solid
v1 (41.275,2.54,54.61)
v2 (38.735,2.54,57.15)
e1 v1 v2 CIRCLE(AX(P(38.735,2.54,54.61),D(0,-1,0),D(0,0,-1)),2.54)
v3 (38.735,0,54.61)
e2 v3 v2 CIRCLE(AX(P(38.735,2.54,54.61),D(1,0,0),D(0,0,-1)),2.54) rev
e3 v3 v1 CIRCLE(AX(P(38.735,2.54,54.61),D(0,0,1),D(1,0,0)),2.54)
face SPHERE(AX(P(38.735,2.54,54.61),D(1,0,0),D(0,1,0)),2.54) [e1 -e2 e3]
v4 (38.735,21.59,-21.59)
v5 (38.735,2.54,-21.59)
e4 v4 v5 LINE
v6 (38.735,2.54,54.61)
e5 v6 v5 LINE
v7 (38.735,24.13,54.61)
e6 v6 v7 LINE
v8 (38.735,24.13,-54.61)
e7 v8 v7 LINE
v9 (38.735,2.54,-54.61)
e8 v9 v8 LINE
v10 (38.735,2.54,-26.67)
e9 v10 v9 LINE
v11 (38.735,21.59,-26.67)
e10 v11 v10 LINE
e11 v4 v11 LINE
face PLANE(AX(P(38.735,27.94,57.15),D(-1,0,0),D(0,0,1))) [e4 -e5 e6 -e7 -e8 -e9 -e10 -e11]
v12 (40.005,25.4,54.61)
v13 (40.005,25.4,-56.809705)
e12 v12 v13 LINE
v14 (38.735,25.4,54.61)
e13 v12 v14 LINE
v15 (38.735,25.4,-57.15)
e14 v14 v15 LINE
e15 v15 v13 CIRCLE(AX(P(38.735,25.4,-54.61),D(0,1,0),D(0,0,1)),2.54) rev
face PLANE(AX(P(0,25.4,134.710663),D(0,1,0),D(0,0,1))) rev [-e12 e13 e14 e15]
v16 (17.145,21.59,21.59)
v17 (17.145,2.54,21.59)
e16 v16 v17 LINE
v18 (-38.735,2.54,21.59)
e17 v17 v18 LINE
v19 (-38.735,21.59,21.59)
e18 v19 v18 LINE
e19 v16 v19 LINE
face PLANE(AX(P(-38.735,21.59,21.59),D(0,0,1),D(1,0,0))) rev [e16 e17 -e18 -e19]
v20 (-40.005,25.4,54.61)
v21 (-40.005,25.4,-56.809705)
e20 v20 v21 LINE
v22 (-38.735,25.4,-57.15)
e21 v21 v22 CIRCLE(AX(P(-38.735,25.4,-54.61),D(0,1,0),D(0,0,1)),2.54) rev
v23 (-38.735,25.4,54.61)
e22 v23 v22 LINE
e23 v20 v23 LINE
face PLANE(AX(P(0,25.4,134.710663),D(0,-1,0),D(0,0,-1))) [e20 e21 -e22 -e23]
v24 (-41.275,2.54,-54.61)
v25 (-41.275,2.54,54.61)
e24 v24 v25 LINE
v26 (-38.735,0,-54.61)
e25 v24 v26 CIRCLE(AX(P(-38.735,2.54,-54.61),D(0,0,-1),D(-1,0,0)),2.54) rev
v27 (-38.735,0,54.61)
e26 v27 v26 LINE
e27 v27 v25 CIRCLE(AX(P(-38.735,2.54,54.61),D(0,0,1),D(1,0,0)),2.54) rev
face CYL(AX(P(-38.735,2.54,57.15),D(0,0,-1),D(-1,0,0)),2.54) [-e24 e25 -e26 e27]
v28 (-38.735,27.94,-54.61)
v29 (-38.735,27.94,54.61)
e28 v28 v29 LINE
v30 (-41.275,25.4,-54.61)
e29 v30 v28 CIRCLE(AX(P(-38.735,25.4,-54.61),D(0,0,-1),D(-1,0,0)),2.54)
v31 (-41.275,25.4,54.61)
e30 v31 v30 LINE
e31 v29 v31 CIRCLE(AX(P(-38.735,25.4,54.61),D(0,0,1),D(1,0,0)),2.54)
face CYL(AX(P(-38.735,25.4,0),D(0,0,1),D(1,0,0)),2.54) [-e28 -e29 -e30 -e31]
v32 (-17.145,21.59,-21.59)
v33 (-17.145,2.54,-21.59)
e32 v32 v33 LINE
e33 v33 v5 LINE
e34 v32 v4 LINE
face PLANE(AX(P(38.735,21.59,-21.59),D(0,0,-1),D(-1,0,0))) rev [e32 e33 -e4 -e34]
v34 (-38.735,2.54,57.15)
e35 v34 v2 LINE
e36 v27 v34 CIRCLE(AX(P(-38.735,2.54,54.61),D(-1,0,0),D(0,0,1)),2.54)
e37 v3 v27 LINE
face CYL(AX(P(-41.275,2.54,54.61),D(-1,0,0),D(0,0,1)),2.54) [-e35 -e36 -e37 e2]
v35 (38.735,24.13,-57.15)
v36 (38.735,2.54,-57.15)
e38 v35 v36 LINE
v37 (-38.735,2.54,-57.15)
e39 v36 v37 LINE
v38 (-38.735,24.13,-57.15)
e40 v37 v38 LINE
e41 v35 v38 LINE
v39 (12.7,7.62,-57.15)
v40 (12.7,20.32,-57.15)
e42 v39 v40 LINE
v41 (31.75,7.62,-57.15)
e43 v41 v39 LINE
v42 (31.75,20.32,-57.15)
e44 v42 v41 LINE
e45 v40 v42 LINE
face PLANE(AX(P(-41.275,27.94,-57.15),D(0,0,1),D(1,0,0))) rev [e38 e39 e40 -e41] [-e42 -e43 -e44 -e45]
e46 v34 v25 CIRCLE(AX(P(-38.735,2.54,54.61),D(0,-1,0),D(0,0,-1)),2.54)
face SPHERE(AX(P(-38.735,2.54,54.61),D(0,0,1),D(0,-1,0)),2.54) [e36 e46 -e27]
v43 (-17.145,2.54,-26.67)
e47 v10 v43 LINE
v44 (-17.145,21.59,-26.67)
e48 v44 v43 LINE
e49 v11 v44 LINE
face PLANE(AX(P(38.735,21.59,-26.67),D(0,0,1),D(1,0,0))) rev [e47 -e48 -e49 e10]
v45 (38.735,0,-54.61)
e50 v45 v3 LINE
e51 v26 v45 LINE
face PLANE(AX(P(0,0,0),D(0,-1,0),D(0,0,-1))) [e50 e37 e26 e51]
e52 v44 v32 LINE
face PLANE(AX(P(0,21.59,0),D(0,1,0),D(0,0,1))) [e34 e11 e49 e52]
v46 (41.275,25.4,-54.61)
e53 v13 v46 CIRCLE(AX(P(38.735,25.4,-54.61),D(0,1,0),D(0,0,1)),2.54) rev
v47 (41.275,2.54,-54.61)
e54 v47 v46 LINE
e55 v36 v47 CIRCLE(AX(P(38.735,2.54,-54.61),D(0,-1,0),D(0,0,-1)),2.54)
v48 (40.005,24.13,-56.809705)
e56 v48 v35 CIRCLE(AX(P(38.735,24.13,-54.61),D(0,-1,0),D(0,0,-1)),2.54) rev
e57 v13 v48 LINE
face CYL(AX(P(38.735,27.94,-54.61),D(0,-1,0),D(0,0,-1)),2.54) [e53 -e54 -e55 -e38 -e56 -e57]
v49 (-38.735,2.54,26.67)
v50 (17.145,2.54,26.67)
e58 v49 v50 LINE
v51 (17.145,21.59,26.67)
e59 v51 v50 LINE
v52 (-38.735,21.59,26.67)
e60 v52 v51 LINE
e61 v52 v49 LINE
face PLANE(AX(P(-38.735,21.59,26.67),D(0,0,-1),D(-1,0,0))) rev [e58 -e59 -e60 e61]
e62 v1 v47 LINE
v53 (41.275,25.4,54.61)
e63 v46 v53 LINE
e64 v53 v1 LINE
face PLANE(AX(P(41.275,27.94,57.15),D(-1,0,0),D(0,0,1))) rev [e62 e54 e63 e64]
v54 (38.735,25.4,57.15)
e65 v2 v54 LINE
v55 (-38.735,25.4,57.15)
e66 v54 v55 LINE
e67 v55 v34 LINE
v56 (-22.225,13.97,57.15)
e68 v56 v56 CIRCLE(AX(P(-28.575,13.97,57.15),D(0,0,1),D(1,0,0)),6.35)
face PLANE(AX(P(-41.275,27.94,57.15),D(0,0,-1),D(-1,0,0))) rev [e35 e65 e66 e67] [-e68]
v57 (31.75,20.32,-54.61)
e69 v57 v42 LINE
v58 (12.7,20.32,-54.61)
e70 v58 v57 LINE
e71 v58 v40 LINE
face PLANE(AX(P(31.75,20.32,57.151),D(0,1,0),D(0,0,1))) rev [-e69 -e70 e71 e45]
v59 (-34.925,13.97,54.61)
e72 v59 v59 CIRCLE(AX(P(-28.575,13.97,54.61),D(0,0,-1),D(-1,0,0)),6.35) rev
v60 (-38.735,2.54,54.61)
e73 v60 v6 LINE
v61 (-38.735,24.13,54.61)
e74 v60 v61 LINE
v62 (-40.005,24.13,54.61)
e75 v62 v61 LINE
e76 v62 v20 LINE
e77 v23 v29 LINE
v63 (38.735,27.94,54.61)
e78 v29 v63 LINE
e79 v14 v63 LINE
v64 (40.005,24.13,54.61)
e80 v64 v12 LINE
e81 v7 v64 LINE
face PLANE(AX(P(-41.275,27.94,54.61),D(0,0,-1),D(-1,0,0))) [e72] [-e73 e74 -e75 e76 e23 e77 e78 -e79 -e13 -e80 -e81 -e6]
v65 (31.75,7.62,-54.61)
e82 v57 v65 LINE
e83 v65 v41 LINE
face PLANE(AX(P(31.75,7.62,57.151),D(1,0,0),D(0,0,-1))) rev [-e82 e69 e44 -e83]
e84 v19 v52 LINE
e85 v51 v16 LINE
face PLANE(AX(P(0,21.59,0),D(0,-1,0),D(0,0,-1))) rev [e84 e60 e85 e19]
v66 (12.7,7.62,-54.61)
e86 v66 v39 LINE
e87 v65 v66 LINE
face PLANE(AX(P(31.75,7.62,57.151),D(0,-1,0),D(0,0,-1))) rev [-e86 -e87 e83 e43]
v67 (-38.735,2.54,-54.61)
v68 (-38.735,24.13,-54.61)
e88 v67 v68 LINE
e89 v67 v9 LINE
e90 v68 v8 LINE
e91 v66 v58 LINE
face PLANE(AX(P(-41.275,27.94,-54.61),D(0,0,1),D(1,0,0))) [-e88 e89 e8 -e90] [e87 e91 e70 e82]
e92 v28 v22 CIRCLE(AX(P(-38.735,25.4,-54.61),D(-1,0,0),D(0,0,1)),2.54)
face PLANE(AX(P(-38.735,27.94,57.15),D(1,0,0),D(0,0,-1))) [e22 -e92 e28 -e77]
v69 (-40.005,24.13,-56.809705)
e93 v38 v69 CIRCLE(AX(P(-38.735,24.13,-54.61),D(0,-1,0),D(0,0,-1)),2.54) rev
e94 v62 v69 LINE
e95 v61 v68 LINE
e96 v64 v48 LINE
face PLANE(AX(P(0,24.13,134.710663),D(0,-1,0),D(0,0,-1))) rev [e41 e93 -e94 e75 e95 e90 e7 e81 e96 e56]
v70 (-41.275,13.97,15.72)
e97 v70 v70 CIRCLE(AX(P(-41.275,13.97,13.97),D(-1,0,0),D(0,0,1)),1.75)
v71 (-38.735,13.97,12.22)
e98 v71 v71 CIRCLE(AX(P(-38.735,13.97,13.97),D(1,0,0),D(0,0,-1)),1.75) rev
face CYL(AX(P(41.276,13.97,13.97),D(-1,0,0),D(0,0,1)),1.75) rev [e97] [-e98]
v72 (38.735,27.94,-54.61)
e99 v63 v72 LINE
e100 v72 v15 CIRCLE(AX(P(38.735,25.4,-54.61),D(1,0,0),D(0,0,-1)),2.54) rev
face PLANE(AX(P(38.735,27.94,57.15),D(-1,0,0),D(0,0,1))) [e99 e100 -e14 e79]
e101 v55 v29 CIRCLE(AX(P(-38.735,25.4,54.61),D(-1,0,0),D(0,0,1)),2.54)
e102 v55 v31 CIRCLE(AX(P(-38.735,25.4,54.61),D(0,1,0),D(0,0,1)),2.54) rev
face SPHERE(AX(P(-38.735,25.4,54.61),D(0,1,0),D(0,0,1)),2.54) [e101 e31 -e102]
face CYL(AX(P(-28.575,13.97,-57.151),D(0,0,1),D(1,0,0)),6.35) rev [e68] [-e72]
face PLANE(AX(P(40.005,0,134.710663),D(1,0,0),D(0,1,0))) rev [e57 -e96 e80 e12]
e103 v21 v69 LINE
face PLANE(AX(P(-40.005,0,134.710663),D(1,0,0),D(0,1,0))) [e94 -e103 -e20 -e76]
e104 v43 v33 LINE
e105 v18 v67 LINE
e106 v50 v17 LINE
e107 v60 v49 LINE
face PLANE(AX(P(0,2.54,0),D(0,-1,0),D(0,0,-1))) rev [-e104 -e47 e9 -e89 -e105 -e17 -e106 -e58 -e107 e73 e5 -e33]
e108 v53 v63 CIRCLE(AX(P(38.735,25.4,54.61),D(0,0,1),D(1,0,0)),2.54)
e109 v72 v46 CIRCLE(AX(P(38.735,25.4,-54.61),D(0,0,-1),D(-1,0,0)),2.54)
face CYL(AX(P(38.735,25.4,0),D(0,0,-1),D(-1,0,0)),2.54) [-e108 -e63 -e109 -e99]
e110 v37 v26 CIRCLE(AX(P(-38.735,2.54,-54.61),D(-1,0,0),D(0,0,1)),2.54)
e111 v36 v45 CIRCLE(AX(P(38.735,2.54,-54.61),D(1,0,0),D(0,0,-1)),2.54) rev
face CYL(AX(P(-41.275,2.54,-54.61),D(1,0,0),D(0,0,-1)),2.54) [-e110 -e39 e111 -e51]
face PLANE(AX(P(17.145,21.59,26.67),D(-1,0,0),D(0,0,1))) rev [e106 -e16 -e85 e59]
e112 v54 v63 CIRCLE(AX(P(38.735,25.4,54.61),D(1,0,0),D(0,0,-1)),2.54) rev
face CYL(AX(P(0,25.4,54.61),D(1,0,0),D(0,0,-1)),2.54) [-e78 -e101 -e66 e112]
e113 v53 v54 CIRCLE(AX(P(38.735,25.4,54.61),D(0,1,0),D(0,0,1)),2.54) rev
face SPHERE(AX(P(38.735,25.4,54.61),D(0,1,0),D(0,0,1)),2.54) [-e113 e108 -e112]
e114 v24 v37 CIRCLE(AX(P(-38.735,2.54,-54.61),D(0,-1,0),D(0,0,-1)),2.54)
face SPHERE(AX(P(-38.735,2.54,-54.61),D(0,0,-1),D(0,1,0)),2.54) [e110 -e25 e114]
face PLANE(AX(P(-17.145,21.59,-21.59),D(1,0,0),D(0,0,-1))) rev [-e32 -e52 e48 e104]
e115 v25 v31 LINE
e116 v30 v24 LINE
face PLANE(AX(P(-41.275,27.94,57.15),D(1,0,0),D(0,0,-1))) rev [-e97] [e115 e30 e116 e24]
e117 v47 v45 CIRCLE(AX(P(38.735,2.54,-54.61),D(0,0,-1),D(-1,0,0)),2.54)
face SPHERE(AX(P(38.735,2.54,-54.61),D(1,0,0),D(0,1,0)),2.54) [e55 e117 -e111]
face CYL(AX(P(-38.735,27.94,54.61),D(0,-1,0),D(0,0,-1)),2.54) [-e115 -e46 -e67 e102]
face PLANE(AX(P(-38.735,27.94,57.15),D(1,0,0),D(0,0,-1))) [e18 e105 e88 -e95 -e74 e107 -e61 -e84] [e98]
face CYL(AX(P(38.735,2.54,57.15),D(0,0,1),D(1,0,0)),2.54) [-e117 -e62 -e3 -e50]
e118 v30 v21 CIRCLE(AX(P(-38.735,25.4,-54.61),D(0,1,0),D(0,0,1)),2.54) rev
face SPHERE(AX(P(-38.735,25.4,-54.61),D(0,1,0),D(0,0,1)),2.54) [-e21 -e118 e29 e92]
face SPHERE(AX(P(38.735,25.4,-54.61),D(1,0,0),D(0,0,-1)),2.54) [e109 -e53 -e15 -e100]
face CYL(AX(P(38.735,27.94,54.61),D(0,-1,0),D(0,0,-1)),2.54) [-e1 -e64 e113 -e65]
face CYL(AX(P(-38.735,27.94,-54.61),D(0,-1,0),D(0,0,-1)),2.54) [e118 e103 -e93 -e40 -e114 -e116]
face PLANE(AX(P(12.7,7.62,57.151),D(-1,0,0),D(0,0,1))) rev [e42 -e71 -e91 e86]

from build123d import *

# Parameters (mm, degrees)
SKETCH1_W           = 82.55
SKETCH1_H           = 114.3
BOSS_EXTRUDE1_DEPTH = 27.94
FILLET1_R           = 2.54
SHELL2_START        = -38.735
SHELL2_OUTLINE_W    = 25.4
SHELL2_OUTLINE_H    = 109.22
SHELL2_DEPTH        = 77.47
SKETCH2_W           = 55.88
SKETCH2_H           = 5.08
BOSS_EXTRUDE2_DEPTH = 19.05
CUT_EXTRUDE1_REACH  = 106.217
SKETCH3_R           = 1.75
CUT_EXTRUDE2_REACH  = 126.695
SKETCH4_R           = 6.35
CUT_EXTRUDE3_REACH  = 126.695
SKETCH5_W           = 19.05
SKETCH5_H           = 12.7
SKETCH6_W           = 38.735
SKETCH6_H           = 2.54
SKETCH6_H_2         = 1.27
SKETCH6_W_2         = 1.27
CUT_EXTRUDE4_DEPTH  = 111.76


# Read off the part's stored shape, not the designer's step: Shell2
with BuildPart() as part:
    # Sketch1 → Boss-Extrude1 (new body)
    with BuildSketch(Plane(origin=(0, 0, 0), x_dir=(1, 0, 0), z_dir=(0, 1, 0))):
        Rectangle(SKETCH1_W, SKETCH1_H)
    extrude(amount=BOSS_EXTRUDE1_DEPTH)

    # Fillet1
    fillet1_edges = [part.edges().sort_by_distance(p)[0] for p in [
        (-41.275, 27.94, 0),
        (0, 27.94, 57.15),
        (41.275, 27.94, 0),
        (0, 0, 57.15),
        (-41.275, 0, 0),
        (0, 0, -57.15),
        (41.275, 0, 0),
        (41.275, 13.97, 57.15),
        (-41.275, 13.97, 57.15),
        (-41.275, 13.97, -57.15),
        (41.275, 13.97, -57.15),
        (0, 27.94, -57.15),
    ]]
    fillet(fillet1_edges, radius=FILLET1_R)

    # Shell2 outline → Shell2 (cut)
    with BuildSketch(Plane.YZ.offset(SHELL2_START)):
        with Locations((15.24, 0)):
            Rectangle(SHELL2_OUTLINE_W, SHELL2_OUTLINE_H)
    extrude(amount=SHELL2_DEPTH, mode=Mode.SUBTRACT)

    # Sketch2 → Boss-Extrude2 (add)
    with BuildSketch(Plane(origin=(0, 2.54, 0), x_dir=(1, 0, 0), z_dir=(0, 1, 0))):
        with Locations((-10.795, -24.13)):
            Rectangle(SKETCH2_W, SKETCH2_H)
        with Locations((10.795, 24.13)):
            Rectangle(SKETCH2_W, SKETCH2_H)
    extrude(amount=BOSS_EXTRUDE2_DEPTH)

    # Sketch3 → Cut-Extrude1 (cut, up to next)
    with BuildSketch(Plane.ZY.offset(41.275), mode=Mode.PRIVATE) as cut_extrude1_sk1:
        with Locations((13.97, 13.97)):
            Circle(SKETCH3_R)
    cut_extrude1_tool1 = extrude(cut_extrude1_sk1.sketch, amount=-CUT_EXTRUDE1_REACH, mode=Mode.PRIVATE) & part.part
    add(cut_extrude1_tool1.solids().sort_by_distance((-41.275, 13.97, 13.97))[0], mode=Mode.SUBTRACT)

    # Sketch4 → Cut-Extrude2 (cut, up to next)
    with BuildSketch(Plane.XY.offset(57.15), mode=Mode.PRIVATE) as cut_extrude2_sk1:
        with Locations((-28.575, 13.97)):
            Circle(SKETCH4_R)
    cut_extrude2_tool1 = extrude(cut_extrude2_sk1.sketch, amount=-CUT_EXTRUDE2_REACH, mode=Mode.PRIVATE) & part.part
    add(cut_extrude2_tool1.solids().sort_by_distance((-28.575, 13.97, 57.15))[0], mode=Mode.SUBTRACT)

    # Sketch5 → Cut-Extrude3 (cut, up to next)
    with BuildSketch(Plane(origin=(0, 0, -57.15), x_dir=(-1, 0, 0), z_dir=(0, 0, -1)), mode=Mode.PRIVATE) as cut_extrude3_sk1:
        with Locations((-22.225, 13.97)):
            Rectangle(SKETCH5_W, SKETCH5_H)
    cut_extrude3_tool1 = extrude(cut_extrude3_sk1.sketch, amount=-CUT_EXTRUDE3_REACH, mode=Mode.PRIVATE) & part.part
    add(cut_extrude3_tool1.solids().sort_by_distance((22.225, 13.97, -57.15))[0], mode=Mode.SUBTRACT)

    # Sketch6 → Cut-Extrude4 (cut)
    with BuildSketch(Plane(origin=(0, 0, -57.15), x_dir=(-1, 0, 0), z_dir=(0, 0, -1))):
        with Locations((-19.3675, 26.67)):
            Rectangle(SKETCH6_W, SKETCH6_H)
        with Locations((-19.3675, 24.765)):
            Rectangle(SKETCH6_W, SKETCH6_H_2)
        with Locations((-39.37, 24.765)):
            Rectangle(SKETCH6_W_2, SKETCH6_H_2)
        with Locations((39.37, 24.765)):
            Rectangle(SKETCH6_W_2, SKETCH6_H_2)
        with Locations((19.3675, 26.67)):
            Rectangle(SKETCH6_W, SKETCH6_H)
        with Locations((19.3675, 24.765)):
            Rectangle(SKETCH6_W, SKETCH6_H_2)
    extrude(amount=-CUT_EXTRUDE4_DEPTH, mode=Mode.SUBTRACT)


solid = part.part
